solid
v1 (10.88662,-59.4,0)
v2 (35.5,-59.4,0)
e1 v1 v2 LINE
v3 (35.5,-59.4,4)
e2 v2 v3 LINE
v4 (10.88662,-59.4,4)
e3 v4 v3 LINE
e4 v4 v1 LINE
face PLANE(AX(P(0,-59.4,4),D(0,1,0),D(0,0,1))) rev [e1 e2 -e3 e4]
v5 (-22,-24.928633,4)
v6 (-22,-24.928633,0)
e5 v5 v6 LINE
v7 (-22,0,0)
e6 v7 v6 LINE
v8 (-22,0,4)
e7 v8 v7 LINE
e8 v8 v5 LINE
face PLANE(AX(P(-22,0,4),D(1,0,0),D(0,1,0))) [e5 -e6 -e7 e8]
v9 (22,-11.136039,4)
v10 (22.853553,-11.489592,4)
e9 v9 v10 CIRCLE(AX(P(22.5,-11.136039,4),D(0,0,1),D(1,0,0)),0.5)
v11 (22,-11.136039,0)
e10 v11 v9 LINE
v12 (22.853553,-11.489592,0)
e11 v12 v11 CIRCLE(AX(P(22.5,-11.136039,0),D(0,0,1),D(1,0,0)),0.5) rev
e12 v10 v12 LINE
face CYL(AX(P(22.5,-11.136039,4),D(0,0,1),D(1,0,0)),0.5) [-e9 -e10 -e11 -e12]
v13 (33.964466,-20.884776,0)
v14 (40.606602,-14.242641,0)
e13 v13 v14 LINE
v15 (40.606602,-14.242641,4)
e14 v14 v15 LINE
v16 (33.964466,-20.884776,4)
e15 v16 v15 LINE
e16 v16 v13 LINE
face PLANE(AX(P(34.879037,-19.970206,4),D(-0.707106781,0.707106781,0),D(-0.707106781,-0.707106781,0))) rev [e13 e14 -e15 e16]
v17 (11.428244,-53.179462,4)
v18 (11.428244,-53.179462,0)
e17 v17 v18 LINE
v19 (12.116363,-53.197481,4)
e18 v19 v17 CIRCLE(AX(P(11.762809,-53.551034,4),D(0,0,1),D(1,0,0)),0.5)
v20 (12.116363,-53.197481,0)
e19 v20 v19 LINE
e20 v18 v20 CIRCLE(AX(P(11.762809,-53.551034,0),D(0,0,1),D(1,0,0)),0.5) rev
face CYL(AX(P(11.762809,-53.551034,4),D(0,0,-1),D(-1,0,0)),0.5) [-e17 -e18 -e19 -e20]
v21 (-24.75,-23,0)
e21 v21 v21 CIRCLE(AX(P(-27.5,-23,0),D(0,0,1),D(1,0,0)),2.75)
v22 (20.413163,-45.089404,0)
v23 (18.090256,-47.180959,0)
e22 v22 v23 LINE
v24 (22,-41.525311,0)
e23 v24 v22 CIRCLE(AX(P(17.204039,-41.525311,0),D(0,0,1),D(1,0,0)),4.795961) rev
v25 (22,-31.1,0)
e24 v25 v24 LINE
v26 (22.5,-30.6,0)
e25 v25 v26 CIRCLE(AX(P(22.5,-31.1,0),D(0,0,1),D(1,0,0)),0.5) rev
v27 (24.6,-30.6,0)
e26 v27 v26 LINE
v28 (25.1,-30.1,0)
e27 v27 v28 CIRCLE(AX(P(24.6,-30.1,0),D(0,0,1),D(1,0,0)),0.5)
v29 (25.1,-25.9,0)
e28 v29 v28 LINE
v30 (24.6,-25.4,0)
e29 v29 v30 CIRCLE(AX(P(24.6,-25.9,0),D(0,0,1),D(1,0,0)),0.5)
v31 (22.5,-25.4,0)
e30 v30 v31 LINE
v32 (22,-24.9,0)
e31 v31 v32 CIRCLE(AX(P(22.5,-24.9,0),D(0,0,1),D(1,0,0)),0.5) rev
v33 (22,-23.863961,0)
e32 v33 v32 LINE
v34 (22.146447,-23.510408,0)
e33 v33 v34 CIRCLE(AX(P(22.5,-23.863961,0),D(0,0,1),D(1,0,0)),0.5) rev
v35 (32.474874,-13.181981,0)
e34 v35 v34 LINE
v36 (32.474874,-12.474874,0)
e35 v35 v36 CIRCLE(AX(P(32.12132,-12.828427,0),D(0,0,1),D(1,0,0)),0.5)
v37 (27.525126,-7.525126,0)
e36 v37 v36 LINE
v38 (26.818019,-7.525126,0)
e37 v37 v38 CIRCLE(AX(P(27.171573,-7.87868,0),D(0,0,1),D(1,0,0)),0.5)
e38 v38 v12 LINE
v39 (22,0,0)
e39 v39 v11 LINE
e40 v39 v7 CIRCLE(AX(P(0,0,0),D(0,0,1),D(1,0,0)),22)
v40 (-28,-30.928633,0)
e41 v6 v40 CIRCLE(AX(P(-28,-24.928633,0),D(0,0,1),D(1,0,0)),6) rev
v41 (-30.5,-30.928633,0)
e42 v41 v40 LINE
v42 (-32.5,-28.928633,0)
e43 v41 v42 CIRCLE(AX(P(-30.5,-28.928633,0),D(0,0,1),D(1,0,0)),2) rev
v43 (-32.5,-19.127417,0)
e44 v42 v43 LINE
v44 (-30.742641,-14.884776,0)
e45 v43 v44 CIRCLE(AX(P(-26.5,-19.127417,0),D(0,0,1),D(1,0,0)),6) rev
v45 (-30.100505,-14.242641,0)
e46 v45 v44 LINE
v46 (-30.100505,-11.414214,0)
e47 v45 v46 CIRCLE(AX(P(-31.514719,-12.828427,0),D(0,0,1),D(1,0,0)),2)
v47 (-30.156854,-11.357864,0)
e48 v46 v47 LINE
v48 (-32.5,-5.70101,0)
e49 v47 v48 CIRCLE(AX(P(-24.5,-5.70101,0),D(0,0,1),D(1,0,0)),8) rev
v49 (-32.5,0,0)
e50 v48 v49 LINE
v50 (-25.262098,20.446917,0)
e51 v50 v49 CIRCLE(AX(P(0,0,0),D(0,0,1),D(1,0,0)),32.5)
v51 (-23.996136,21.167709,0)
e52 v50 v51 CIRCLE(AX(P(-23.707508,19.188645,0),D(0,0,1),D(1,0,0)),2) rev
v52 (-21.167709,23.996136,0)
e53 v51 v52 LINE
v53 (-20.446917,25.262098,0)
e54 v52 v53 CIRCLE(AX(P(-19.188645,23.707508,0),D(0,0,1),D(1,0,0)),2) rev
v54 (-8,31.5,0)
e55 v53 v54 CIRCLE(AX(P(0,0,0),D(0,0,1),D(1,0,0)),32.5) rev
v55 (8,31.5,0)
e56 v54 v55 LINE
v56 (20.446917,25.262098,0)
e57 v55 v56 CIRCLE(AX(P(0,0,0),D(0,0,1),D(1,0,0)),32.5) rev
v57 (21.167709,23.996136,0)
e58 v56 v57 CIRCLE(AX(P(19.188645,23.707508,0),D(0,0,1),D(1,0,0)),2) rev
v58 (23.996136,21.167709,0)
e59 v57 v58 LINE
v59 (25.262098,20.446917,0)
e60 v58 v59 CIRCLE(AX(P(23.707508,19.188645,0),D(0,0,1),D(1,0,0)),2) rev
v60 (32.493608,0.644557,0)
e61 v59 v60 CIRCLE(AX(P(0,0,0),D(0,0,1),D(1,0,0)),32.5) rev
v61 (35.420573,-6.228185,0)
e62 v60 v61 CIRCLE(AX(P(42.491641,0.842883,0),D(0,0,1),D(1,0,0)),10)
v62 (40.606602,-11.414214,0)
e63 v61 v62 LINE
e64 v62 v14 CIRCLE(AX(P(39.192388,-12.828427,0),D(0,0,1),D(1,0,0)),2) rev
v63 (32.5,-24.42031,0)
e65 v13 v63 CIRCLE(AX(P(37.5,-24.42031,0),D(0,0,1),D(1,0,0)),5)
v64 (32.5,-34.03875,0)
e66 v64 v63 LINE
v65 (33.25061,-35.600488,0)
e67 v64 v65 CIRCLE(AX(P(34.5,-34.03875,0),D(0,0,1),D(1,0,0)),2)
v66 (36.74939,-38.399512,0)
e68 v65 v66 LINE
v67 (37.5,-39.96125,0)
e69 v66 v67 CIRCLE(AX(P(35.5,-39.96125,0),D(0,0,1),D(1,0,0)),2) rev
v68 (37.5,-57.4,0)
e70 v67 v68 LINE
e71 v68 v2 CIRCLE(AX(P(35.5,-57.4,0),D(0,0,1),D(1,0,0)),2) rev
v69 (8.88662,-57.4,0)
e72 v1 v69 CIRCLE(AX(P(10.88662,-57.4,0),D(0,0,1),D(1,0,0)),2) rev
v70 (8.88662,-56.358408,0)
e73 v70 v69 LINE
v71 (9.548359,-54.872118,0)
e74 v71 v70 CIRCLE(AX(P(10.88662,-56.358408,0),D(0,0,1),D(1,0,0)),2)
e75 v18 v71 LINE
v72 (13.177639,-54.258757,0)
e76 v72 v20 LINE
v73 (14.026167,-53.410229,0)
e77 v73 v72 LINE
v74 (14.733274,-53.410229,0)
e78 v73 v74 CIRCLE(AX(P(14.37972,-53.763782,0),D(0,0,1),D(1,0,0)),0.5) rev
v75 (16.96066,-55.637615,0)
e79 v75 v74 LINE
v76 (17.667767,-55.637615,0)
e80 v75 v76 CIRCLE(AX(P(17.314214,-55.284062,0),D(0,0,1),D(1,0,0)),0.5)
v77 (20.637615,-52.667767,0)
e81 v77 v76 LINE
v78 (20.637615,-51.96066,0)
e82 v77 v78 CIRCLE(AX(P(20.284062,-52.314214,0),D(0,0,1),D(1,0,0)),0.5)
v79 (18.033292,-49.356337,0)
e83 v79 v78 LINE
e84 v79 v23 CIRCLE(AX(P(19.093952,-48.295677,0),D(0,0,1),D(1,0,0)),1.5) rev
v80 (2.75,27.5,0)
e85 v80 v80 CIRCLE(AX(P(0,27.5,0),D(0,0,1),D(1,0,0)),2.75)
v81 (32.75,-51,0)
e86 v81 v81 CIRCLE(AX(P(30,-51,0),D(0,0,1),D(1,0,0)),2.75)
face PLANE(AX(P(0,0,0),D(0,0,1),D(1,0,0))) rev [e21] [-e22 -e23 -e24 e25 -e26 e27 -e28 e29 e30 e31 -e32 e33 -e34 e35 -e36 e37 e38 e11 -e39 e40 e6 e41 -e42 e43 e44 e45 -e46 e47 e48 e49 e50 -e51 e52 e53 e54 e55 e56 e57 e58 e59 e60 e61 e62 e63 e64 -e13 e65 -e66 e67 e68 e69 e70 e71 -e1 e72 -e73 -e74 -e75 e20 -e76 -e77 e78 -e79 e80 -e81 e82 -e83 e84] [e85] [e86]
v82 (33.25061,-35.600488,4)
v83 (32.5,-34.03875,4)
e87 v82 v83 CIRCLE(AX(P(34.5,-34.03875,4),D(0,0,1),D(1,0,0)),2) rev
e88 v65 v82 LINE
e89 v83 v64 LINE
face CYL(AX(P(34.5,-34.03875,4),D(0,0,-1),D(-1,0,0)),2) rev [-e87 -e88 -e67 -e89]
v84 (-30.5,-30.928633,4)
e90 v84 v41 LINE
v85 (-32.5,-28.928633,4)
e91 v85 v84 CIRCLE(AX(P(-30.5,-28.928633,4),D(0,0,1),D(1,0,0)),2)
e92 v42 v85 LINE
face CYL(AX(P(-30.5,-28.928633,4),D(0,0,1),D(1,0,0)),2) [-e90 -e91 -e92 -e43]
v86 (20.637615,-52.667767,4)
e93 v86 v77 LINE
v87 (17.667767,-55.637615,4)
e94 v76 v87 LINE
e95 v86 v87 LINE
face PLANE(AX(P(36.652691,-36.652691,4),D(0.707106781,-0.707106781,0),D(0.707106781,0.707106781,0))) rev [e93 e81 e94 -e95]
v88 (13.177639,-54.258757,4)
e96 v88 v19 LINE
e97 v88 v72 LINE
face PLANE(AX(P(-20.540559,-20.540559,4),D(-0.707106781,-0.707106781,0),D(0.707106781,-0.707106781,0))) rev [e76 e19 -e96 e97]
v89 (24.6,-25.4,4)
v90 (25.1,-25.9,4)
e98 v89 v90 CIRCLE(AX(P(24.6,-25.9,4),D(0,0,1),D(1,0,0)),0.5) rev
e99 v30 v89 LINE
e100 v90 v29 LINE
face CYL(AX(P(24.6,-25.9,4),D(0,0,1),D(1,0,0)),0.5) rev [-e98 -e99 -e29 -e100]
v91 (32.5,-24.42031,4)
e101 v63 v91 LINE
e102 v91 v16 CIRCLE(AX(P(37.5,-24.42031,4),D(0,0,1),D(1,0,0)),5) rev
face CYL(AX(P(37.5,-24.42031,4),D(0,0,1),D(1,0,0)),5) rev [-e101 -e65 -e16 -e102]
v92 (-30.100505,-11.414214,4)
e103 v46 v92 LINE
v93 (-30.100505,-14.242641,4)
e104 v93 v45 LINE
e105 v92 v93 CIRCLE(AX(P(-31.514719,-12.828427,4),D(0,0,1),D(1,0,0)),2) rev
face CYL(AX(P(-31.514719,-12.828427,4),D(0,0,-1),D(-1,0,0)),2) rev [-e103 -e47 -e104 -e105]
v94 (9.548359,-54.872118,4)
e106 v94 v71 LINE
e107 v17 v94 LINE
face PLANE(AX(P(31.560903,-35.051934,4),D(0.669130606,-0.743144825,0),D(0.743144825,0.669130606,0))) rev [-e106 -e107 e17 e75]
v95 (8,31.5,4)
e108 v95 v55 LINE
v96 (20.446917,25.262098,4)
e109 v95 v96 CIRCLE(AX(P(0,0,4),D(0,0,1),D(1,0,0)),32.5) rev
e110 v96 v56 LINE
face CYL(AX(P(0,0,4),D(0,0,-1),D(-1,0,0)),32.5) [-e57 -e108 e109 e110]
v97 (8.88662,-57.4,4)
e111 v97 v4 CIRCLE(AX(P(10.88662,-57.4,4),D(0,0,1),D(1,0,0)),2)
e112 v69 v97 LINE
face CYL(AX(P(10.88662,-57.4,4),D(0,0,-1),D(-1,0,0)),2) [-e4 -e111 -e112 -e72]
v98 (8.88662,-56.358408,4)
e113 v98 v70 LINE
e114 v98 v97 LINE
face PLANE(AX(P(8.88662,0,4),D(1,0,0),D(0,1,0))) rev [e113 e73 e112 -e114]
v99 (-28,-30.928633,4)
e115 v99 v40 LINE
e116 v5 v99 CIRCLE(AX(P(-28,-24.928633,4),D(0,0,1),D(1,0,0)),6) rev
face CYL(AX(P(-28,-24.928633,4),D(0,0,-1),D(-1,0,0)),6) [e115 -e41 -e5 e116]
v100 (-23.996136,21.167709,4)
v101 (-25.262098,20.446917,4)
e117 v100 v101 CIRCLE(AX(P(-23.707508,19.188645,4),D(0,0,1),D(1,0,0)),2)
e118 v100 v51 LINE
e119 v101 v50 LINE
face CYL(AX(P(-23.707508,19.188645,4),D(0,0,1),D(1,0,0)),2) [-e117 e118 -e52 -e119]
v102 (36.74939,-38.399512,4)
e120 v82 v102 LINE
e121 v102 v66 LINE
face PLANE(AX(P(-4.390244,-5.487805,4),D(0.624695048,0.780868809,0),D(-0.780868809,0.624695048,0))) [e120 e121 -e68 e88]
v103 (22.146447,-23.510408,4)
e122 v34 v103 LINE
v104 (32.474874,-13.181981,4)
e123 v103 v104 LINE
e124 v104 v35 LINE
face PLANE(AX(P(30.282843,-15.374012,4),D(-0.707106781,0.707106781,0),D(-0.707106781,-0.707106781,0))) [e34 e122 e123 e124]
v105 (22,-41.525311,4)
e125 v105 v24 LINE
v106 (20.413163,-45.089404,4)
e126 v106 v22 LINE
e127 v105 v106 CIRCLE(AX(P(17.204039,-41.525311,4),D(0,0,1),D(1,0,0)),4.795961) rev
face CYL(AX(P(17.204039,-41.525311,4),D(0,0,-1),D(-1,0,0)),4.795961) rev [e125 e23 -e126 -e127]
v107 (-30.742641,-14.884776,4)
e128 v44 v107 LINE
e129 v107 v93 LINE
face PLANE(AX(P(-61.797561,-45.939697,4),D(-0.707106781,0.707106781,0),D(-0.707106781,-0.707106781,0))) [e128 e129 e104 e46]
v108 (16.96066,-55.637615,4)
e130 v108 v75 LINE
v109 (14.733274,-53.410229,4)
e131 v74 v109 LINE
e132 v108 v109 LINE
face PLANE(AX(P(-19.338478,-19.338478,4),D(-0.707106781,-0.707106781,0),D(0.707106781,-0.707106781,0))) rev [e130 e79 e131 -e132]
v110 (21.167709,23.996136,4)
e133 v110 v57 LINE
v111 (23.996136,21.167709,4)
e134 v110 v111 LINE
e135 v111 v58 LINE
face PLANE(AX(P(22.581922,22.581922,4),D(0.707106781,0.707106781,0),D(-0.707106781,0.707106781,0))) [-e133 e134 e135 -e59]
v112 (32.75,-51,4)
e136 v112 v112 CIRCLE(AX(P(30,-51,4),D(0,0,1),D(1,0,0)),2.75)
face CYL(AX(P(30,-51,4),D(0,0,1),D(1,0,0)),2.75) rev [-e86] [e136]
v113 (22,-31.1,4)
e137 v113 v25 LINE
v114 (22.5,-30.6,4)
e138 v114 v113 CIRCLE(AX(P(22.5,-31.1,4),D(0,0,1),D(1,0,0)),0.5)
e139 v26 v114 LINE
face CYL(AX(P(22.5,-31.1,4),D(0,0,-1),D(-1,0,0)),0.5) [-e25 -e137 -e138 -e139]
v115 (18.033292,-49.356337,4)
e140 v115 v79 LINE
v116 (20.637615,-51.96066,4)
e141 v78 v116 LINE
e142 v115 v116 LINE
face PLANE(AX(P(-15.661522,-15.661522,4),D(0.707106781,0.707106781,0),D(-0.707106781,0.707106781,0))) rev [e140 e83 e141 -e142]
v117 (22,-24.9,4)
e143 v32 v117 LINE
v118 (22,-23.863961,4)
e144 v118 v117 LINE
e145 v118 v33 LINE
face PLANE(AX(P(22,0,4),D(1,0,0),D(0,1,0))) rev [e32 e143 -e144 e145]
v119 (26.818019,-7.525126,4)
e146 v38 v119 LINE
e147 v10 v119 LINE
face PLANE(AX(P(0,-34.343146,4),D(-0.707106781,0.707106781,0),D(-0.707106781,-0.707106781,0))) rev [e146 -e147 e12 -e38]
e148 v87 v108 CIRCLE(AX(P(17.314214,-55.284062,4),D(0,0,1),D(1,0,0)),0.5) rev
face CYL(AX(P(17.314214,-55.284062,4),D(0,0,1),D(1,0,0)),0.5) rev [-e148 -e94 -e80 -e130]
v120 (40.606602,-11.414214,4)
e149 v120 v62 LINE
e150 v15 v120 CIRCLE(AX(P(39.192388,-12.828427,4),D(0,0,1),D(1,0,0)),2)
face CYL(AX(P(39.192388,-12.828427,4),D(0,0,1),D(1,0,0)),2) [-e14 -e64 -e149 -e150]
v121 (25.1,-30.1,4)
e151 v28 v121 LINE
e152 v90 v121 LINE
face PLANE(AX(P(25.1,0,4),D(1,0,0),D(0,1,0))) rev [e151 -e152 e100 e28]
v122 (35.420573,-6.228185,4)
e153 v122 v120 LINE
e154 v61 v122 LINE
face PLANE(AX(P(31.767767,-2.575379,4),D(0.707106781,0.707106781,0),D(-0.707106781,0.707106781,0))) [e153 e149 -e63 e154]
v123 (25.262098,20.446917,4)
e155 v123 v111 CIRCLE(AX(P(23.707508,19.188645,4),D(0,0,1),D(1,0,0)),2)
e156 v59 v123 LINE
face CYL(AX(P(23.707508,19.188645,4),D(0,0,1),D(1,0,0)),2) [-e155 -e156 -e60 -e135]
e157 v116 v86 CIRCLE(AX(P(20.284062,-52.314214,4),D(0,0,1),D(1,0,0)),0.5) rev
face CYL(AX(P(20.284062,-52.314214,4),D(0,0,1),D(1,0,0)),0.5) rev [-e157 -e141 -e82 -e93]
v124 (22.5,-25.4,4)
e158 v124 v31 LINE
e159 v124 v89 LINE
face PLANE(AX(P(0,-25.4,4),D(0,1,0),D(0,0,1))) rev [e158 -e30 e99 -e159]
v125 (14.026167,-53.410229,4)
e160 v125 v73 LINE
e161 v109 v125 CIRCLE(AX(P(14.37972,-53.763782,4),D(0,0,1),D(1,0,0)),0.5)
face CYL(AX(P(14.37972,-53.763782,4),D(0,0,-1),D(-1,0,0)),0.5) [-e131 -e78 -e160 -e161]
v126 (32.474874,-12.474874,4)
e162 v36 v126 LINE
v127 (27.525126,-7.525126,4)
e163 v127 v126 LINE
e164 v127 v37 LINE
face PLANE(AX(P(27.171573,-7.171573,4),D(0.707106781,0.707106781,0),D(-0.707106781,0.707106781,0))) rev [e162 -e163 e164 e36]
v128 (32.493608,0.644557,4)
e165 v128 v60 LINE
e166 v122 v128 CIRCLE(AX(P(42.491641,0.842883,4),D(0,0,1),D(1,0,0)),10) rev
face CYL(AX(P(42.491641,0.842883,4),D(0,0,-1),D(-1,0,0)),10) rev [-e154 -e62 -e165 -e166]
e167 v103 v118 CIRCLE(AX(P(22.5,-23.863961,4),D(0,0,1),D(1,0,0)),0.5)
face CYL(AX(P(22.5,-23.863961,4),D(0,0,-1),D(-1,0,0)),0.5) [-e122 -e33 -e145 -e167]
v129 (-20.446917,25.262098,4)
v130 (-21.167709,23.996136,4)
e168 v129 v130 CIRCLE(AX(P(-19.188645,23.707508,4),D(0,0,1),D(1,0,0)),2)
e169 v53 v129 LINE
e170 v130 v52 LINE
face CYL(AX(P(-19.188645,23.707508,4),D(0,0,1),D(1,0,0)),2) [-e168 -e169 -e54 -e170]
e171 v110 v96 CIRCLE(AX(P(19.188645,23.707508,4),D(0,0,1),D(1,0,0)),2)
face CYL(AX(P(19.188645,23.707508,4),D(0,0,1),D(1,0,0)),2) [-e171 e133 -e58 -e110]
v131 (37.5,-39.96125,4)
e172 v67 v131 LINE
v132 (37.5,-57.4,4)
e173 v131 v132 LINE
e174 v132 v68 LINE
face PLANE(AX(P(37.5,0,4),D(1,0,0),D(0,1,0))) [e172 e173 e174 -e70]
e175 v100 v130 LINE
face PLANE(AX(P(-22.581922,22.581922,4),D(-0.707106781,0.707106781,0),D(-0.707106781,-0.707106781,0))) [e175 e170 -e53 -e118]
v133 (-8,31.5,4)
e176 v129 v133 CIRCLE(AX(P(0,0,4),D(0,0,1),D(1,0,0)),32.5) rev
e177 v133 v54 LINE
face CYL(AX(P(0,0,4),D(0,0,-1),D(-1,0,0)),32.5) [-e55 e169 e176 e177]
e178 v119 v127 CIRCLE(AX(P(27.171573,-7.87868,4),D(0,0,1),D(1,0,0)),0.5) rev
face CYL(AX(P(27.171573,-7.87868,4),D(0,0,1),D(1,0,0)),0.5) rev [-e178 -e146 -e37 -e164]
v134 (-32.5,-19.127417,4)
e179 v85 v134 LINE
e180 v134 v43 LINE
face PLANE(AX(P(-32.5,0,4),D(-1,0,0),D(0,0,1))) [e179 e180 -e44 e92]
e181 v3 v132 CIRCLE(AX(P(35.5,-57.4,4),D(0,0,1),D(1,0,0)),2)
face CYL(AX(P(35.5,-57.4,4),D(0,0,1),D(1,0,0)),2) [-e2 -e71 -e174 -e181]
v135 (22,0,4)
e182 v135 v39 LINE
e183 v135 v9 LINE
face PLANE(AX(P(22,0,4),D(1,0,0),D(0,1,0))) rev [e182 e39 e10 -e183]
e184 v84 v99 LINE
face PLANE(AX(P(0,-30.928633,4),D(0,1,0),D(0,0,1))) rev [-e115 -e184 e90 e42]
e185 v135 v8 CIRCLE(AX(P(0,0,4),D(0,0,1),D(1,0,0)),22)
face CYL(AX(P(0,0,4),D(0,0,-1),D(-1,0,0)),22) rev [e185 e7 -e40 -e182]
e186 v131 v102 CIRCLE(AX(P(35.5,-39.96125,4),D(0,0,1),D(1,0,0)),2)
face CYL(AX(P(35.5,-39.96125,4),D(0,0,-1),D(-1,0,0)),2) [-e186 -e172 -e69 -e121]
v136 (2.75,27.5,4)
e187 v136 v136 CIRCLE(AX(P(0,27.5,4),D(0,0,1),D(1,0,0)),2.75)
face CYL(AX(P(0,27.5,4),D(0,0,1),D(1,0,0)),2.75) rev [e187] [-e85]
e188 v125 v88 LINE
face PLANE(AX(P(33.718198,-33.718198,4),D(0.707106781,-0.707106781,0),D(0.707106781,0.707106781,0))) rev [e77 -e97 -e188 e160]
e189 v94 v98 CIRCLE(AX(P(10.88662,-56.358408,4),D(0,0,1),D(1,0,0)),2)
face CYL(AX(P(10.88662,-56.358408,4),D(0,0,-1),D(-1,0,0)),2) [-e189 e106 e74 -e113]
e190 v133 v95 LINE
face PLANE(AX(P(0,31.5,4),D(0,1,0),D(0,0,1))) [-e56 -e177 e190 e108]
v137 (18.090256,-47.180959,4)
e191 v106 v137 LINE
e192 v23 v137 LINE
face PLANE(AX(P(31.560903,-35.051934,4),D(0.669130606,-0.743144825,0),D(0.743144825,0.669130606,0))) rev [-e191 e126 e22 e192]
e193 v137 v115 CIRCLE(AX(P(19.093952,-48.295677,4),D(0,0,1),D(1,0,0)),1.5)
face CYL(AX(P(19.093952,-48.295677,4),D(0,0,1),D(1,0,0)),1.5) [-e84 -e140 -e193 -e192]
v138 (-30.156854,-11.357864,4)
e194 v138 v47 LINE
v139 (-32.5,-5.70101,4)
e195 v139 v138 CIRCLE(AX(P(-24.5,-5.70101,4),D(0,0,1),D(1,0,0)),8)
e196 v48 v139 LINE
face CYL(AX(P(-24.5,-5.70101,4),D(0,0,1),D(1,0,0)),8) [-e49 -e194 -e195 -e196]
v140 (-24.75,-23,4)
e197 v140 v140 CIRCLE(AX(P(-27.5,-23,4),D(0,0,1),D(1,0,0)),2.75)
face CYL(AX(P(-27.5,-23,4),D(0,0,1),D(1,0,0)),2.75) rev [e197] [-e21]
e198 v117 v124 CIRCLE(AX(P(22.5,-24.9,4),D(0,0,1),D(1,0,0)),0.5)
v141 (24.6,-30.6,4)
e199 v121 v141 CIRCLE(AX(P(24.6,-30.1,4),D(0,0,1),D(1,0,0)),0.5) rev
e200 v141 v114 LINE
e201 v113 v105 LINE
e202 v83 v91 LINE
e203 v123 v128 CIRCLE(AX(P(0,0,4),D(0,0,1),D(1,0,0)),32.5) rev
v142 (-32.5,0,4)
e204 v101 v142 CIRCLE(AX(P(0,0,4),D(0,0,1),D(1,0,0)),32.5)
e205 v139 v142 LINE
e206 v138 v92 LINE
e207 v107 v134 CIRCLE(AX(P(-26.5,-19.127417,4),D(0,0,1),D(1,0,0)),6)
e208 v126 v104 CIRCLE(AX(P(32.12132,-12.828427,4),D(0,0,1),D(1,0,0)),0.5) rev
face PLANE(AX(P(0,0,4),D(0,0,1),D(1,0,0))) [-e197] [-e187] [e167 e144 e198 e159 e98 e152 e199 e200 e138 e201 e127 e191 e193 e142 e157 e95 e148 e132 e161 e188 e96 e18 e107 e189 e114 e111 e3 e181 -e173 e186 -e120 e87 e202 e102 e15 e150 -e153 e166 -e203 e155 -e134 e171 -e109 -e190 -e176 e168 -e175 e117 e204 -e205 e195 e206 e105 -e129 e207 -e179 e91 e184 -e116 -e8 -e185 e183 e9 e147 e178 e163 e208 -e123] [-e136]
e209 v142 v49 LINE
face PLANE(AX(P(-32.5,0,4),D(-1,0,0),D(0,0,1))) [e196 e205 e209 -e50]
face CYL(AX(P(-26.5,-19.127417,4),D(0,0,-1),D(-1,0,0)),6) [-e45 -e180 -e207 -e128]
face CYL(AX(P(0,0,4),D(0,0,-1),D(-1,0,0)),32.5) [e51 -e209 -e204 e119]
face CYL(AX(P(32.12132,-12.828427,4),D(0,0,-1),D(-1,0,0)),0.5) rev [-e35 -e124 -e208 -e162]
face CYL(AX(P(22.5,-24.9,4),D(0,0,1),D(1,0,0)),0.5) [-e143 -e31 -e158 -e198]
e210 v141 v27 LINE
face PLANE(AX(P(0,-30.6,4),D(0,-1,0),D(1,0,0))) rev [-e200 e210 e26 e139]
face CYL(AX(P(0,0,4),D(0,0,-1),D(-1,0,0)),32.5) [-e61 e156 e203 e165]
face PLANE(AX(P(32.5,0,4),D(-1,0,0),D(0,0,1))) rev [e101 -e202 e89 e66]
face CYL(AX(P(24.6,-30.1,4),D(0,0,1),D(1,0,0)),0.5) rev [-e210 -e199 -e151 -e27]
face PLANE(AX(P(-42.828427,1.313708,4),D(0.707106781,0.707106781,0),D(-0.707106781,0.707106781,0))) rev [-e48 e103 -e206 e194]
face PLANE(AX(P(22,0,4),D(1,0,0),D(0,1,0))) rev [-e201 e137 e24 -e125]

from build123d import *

# Parameters (mm, degrees)
CORPS_DEPTH                     = 4
DIAM_TRE_DU_PER_AGE_5_5_5_5_2_D = 5.5
RENFORT_CAVITE_IR_DEPTH         = 4
CAVITE_IR_DEPTH                 = 73.870494144
CAVITE_SWITCH_DEPTH             = 73.870494144
CONG_1_R                        = 2
CONG_1_R_2                      = 5
CONG_1_R_3                      = 10
CONG_1_R_4                      = 8
CONG_1_R_5                      = 6
CONG_1_R_6                      = 1.5
CONG_2_R                        = 0.5


with BuildPart() as part:
    # Esquisse1 → corps (new body)
    with BuildSketch(Plane.XY):
        with BuildLine():
            Line((-21.1677086, 23.996135725), (-21.1677086, 24.661267457))
            ThreePointArc((-21.1677086, 24.661267457), (-14.979348182, 28.84214153), (-8, 31.5))
            Line((-8, 31.5), (8, 31.5))
            ThreePointArc((8, 31.5), (14.979348182, 28.84214153), (21.1677086, 24.661267457))
            Line((21.1677086, 24.661267457), (21.1677086, 23.996135725))
            Line((21.1677086, 23.996135725), (23.996135725, 21.1677086))
            Line((23.996135725, 21.1677086), (24.661267457, 21.1677086))
            ThreePointArc((24.661267457, 21.1677086), (30.477378434, 11.286248439), (32.5, 0))
            Line((32.5, 0), (32.5, -35))
            Line((32.5, -35), (37.5, -39))
            Line((37.5, -39), (37.5, -59.4))
            Line((37.5, -59.4), (8.886620253, -59.4))
            Line((8.886620253, -59.4), (8.886620253, -56.358407696))
            ThreePointArc((8.886620253, -56.358407696), (9.059529338, -55.54493441), (9.54835904, -54.872118045))
            Line((9.54835904, -54.872118045), (20.413163329, -45.089404323))
            ThreePointArc((20.413163329, -45.089404323), (21.585367396, -43.476003838), (22, -41.525310806))
            Line((22, -41.525310806), (22, 0))
            ThreePointArc((22, 0), (0, 22), (-22, 0))
            Line((-22, 0), (-22, -24.928632557))
            ThreePointArc((-22, -24.928632557), (-23.757359313, -29.171273244), (-28, -30.928632557))
            Line((-28, -30.928632557), (-32.5, -30.928632557))
            Line((-32.5, -30.928632557), (-32.5, 0))
            ThreePointArc((-32.5, 0), (-30.477378434, 11.286248439), (-24.661267457, 21.1677086))
            Line((-24.661267457, 21.1677086), (-23.996135725, 21.1677086))
            Line((-23.996135725, 21.1677086), (-21.1677086, 23.996135725))
        make_face()
    extrude(amount=CORPS_DEPTH)

    # Diamètre du perçage Ø5.5 (5.5)2 (through all)
    with Locations(Plane.XY.offset(4)):
        with Locations((0, 27.5), (30, -51), (-27.5, -23)):
            Hole(DIAM_TRE_DU_PER_AGE_5_5_5_5_2_D / 2)

    # Esquisse4 → renfort_cavite_IR (add, through all)
    with BuildSketch(Plane.XY):
        Polygon((31.767766953, -2.575378798), (42.02081528, -12.828427125), (34.87903679, -19.970205615), (27.454415588, -27.394826817), (24.625988463, -9.717157288), align=None)
    extrude(amount=RENFORT_CAVITE_IR_DEPTH)

    # Esquisse4<4> → cavite_IR (cut, through all)
    with BuildSketch(Plane.XY):
        Polygon((0, -34.343145751), (24.625988463, -9.717157288), (27.171572875, -7.171572875), (32.828427125, -12.828427125), (30.282842712, -15.374011537), (0, -45.656854249), align=None)
        Polygon((-75.939696962, -31.797561338), (-42.828427125, 1.313708499), (-28.686291501, -12.828427125), (-61.797561338, -45.939696962), align=None)
    extrude(amount=CAVITE_IR_DEPTH, mode=Mode.SUBTRACT)

    # Esquisse5 → cavite_switch (cut, through all)
    with BuildSketch(Plane.XY):
        Polygon((13.884745674, -52.561700936), (12.661450942, -51.338406204), (16.338406204, -47.661450942), (17.561700936, -48.884745674), (17.915254326, -49.238299064), (20.920458146, -52.243502884), (20.991168825, -52.314213562), (17.314213562, -55.991168825), (17.243502884, -55.920458146), (14.238299064, -52.915254326), align=None)
        Polygon((13.884745674, -52.561700936), (12.661450942, -51.338406204), (11.459369414, -52.540487732), (13.177638892, -54.258757211), (14.37972042, -53.056675683), (14.238299064, -52.915254326), align=None)
        Polygon((18.52, -25.4), (20.25, -25.4), (20.75, -25.4), (25, -25.4), (25.1, -25.4), (25.1, -30.6), (25, -30.6), (20.75, -30.6), (20.25, -30.6), (18.52, -30.6), align=None)
        Polygon((20.75, -30.6), (20.25, -30.6), (18.52, -30.6), (18.52, -32.3), (20.95, -32.3), (20.95, -30.6), align=None)
    extrude(amount=CAVITE_SWITCH_DEPTH, mode=Mode.SUBTRACT)

    # Congé1
    # the kernel refuses this fillet: 10, 8, 6, 5, 2, 1.5 mm, written as the material it adds along each edge
    with BuildSketch(Plane(origin=(-28.686291501, -12.828427125, 0), x_dir=(-0.7071067811865516, 0.7071067811865436, 0), z_dir=(0, 0, 1))) as cong_1_piece_1:
        with BuildLine():
            CenterArc((CONG_1_R, CONG_1_R), CONG_1_R, 180, 90)
            Line((0, CONG_1_R), (0, 0))
            Line((0, 0), (CONG_1_R, 0))
        make_face()
    extrude(amount=4)
    with BuildSketch(Plane(origin=(32.5, -35, 0), x_dir=(0.7808688094430325, -0.6246950475544215, 0), z_dir=(0, 0, 1))) as cong_1_piece_2:
        with BuildLine():
            CenterArc((CONG_1_R * 0.480624847487, CONG_1_R), CONG_1_R, 218.659808254, 51.340191746)
            Line((-CONG_1_R * 0.300243961956, CONG_1_R * 0.375304952446), (0, 0))
            Line((0, 0), (CONG_1_R * 0.480624847487, 0))
        make_face()
    extrude(amount=4)
    with BuildSketch(Plane(origin=(32.5, -22.349242405, 4), x_dir=(0, -1, 0), z_dir=(0, 0, -1))) as cong_1_piece_3:
        with BuildLine():
            CenterArc((CONG_1_R_2 * 0.414213562373, -CONG_1_R_2), CONG_1_R_2, 90, 45)
            Line((-CONG_1_R_2 * 0.292893218813, -CONG_1_R_2 * 0.292893218813), (0, 0))
            Line((0, 0), (CONG_1_R_2 * 0.414213562373, 0))
        make_face()
    extrude(amount=4)
    with BuildSketch(Plane(origin=(32.5, -3.307611845, 0), x_dir=(0.7071067811865513, -0.7071067811865438, 0), z_dir=(0, 0, 1))) as cong_1_piece_4:
        with BuildLine():
            CenterArc((4.130314106, 10), CONG_1_R_3, 226.136395215, 43.863604785)
            Line((-2.799125719, 2.790085736), (-3.492069702, 2.069094309))
            ThreePointArc((-3.492069702, 2.069094309), (-3.045941546, 1.631727984), (-0.707106781, -0.707106781))
            Line((-0.707106781, -0.707106781), (0, -1))
            Line((0, -1), (4.130314106, -1))
            Line((4.130314106, -1), (4.130314106, 0))
        make_face()
    extrude(amount=4)
    # the kernel refuses this fillet: 10, 8, 6, 5, 2, 1.5 mm, written as the material it takes off along each edge
    with BuildSketch(Plane(origin=(-32.5, -30.928632557, -5), x_dir=(0, 1, 0), z_dir=(0, 0, 1)), Plane(origin=(37.5, -59.4, -5), x_dir=(-1, 0, 0), z_dir=(0, 0, 1)), Plane(origin=(42.02081528, -12.828427125, -5), x_dir=(-0.7071067811865427, -0.7071067811865525, 0), z_dir=(0, 0, 1)), Plane(origin=(8.886620253, -59.4, -5), x_dir=(0, 1, 0), z_dir=(0, 0, 1))) as cong_1_2_piece_1:
        with BuildLine():
            CenterArc((CONG_1_R, -CONG_1_R), CONG_1_R, 90, 90)
            Line((0, -CONG_1_R), (0, 0))
            Line((0, 0), (CONG_1_R, 0))
        make_face()
    extrude(amount=14, mode=Mode.SUBTRACT)
    with BuildSketch(Plane(origin=(37.5, -39, -2.403124237), x_dir=(0, -1, 0), z_dir=(0, 0, 1))) as cong_1_2_piece_2:
        with BuildLine():
            CenterArc((CONG_1_R * 0.480624847487, -CONG_1_R), CONG_1_R, 90, 51.340191746)
            Line((-CONG_1_R * 0.300243961956, -CONG_1_R * 0.375304952446), (0, 0))
            Line((0, 0), (CONG_1_R * 0.480624847487, 0))
        make_face()
    extrude(amount=8.806248475, mode=Mode.SUBTRACT)
    with BuildSketch(Plane(origin=(21.1677086, 24.661267457, -2.345925687), x_dir=(0, -1, 0), z_dir=(0, 0, 1)), Plane(origin=(-24.661267457, 21.1677086, -2.345925687), x_dir=(1, 0, 0), z_dir=(0, 0, 1))) as cong_1_2_piece_3:
        with BuildLine():
            CenterArc((0.953759933, -1.97906386), CONG_1_R, 98.297562286, 42.71603868)
            ThreePointArc((-0.600830724, -0.720792074), (-0.30301692, -0.358227456), (0, 0))
            Line((0, 0), (0.665131732, 0))
        make_face()
    extrude(amount=8.691851375, mode=Mode.SUBTRACT)
    with BuildSketch(Plane(origin=(24.661267457, 21.1677086, -2.345925687), x_dir=(-1, 0, 0), z_dir=(0, 0, 1)), Plane(origin=(-21.1677086, 24.661267457, -2.345925687), x_dir=(0, -1, 0), z_dir=(0, 0, 1))) as cong_1_2_piece_4:
        with BuildLine():
            CenterArc((0.953759933, 1.97906386), CONG_1_R, 218.986399033, 42.71603868)
            ThreePointArc((-0.600830724, 0.720792074), (-0.30301692, 0.358227456), (0, 0))
            Line((0, 0), (0.665131732, 0))
        make_face()
    extrude(amount=8.691851375, mode=Mode.SUBTRACT)
    with BuildSketch(Plane(origin=(-32.5, -9.014718626, 12.284271247), x_dir=(0, 1, 0), z_dir=(0, 0, -1))) as cong_1_2_piece_5:
        with BuildLine():
            CenterArc((CONG_1_R_4 * 0.414213562373, CONG_1_R_4), CONG_1_R_4, 225, 45)
            Line((-CONG_1_R_4 * 0.292893218813, CONG_1_R_4 * 0.292893218813), (0, 0))
            Line((0, 0), (CONG_1_R_4 * 0.414213562373, 0))
        make_face()
    extrude(amount=20.568542495, mode=Mode.SUBTRACT)
    with BuildSketch(Plane(origin=(-32.5, -16.642135624, -6.213203436), x_dir=(0.7071067811865432, 0.7071067811865519, 0), z_dir=(0, 0, 1))) as cong_1_2_piece_6:
        with BuildLine():
            CenterArc((CONG_1_R_5 * 0.414213562373, -CONG_1_R_5), CONG_1_R_5, 90, 45)
            Line((-CONG_1_R_5 * 0.292893218813, -CONG_1_R_5 * 0.292893218813), (0, 0))
            Line((0, 0), (CONG_1_R_5 * 0.414213562373, 0))
        make_face()
    extrude(amount=16.426406871, mode=Mode.SUBTRACT)
    with BuildSketch(Plane(origin=(16.915589345, -48.238634083, 7.95167547), x_dir=(0.7431448254773909, 0.6691306063588618, 0), z_dir=(0, 0, -1))) as cong_1_2_piece_7:
        with BuildLine():
            CenterArc((CONG_1_R_6 * 1.05378012528, CONG_1_R_6), CONG_1_R_6, 177, 93)
            Line((CONG_1_R_6 * 0.0551505905264, CONG_1_R_6 * 1.05233595624), (0, 0))
            Line((0, 0), (CONG_1_R_6 * 1.05378012528, 0))
        make_face()
    extrude(amount=11.90335094, mode=Mode.SUBTRACT)

    # Congé2
    cong_2_edges = [part.edges().sort_by_distance(p)[0] for p in [
        (22, -12.343145751, 2),
        (27.171572875, -7.171572875, 2),
        (22, -23.656854249, 2),
        (32.828427125, -12.828427125, 2),
        (11.780853072, -52.86197139, 2),
        (20.991168825, -52.314213562, 2),
        (14.37972042, -53.056675683, 2),
        (17.314213562, -55.991168825, 2),
        (22, -25.4, 2),
        (25.1, -25.4, 2),
        (22, -30.6, 2),
        (25.1, -30.6, 2),
    ]]
    fillet(cong_2_edges, radius=CONG_2_R)


solid = part.part
